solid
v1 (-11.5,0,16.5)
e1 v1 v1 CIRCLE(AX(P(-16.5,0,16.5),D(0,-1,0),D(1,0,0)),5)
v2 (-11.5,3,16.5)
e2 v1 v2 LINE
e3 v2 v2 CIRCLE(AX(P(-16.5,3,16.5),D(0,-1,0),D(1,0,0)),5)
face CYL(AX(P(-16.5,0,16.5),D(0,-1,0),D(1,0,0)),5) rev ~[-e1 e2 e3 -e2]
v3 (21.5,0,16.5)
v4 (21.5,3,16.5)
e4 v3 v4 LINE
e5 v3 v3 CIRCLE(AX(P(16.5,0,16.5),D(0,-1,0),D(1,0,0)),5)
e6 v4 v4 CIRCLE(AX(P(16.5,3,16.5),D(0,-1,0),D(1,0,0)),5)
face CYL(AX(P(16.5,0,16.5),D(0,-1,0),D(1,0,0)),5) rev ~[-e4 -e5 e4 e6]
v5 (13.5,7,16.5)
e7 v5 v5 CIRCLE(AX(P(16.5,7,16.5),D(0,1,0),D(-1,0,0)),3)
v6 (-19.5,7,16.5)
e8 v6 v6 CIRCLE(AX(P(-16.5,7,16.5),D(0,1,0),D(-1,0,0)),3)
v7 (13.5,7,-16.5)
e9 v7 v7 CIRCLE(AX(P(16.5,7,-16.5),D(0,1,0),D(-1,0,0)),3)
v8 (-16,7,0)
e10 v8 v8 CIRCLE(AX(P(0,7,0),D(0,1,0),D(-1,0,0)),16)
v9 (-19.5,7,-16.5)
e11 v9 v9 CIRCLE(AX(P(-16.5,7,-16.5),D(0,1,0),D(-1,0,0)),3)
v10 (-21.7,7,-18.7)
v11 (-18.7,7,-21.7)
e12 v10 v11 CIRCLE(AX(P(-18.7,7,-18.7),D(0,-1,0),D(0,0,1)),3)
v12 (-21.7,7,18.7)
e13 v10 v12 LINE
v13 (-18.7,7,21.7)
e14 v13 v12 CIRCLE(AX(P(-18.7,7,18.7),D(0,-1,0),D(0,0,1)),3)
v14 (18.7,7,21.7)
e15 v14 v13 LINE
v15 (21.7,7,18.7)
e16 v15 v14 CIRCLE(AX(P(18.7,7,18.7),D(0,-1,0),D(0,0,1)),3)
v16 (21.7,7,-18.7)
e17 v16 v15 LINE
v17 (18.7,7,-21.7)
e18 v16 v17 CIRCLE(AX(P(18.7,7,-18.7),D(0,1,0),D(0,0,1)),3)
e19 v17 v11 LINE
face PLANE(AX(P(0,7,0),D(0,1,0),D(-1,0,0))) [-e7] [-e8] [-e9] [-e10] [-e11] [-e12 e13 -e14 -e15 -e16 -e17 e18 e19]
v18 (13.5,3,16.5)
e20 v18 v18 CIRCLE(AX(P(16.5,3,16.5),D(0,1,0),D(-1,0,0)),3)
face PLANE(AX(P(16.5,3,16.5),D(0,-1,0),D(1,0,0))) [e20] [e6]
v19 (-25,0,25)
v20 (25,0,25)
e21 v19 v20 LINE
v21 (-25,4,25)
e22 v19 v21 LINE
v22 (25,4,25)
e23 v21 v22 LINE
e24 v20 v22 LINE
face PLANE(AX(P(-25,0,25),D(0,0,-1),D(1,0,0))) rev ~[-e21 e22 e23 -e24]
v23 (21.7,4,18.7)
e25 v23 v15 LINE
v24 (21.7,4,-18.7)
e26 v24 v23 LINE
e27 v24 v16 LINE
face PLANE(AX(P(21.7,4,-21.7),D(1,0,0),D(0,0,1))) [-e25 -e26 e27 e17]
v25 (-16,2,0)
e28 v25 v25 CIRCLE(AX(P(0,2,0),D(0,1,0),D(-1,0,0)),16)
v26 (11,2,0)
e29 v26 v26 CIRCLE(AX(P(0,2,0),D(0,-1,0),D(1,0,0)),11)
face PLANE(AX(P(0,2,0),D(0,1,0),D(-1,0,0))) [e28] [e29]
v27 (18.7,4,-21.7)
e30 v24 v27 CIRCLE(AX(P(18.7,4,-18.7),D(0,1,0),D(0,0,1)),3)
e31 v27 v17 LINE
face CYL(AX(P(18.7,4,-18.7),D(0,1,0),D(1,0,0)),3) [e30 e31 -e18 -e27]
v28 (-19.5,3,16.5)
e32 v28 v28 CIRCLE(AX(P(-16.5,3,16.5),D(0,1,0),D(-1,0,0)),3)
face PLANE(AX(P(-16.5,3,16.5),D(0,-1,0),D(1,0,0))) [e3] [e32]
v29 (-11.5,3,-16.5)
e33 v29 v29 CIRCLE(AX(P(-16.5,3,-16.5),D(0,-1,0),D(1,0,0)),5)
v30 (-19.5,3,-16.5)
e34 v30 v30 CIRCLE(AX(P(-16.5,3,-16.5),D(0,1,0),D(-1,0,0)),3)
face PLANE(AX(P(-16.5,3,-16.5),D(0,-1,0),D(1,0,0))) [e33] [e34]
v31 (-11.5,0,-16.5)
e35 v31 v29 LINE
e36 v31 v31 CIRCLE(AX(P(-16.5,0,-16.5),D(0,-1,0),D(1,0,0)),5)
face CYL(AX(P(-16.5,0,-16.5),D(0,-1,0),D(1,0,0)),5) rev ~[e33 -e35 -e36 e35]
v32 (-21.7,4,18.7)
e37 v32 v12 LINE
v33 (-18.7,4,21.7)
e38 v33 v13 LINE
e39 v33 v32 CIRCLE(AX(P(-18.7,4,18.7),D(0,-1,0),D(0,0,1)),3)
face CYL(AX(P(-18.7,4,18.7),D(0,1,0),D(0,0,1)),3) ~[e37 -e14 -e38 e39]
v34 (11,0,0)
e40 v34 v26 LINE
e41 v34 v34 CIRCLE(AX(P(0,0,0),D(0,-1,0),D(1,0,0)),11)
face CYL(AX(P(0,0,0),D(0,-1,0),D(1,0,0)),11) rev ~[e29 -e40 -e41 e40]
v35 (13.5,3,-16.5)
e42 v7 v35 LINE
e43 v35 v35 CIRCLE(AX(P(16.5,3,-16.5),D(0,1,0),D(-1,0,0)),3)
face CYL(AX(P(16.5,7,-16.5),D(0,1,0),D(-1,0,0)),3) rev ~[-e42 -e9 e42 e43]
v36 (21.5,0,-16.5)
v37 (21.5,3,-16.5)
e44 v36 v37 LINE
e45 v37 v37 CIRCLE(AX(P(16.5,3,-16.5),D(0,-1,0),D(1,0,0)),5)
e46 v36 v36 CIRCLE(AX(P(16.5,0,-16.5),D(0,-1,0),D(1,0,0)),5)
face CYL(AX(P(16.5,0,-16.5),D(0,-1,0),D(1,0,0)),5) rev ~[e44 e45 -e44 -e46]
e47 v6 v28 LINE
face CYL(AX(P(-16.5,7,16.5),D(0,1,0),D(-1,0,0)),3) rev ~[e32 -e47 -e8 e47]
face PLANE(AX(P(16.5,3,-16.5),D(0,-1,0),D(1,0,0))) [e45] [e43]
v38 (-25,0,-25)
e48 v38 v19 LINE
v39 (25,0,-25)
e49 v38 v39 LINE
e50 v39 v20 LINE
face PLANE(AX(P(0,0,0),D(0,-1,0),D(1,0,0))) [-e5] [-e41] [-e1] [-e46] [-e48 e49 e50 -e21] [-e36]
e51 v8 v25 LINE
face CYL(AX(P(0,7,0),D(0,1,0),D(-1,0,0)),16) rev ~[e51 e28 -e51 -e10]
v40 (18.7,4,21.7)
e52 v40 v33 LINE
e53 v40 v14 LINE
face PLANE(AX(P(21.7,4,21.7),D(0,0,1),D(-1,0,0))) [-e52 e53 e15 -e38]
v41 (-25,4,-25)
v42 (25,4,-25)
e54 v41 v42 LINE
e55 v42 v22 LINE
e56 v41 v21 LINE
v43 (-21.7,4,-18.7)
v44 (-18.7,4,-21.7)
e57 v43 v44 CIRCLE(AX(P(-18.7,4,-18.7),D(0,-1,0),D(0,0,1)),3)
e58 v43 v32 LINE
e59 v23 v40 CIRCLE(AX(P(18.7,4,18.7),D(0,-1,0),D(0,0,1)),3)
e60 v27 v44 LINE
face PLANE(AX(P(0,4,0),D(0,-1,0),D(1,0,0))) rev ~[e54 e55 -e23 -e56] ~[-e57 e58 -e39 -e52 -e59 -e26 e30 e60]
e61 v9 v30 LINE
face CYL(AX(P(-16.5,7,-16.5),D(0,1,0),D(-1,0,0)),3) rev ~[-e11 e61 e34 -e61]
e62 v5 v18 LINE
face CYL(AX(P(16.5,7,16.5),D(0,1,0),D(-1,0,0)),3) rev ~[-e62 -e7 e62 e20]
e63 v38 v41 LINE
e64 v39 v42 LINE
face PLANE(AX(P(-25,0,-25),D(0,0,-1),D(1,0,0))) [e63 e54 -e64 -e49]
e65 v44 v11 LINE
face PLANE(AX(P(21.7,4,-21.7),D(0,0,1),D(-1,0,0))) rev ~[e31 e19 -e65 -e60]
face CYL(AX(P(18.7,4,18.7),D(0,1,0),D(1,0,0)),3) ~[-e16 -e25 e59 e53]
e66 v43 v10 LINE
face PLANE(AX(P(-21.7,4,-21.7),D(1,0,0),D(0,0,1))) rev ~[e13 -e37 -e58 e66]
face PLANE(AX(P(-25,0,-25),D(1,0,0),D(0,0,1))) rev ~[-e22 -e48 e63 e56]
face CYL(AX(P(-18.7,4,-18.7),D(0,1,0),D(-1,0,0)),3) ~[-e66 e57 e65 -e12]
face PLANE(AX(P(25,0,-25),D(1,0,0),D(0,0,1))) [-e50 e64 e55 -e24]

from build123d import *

# Parameters (mm, degrees)
F0_W      = 50
F0_H      = 50
F1_DEPTH  = 4
F2_W      = 43.4
F2_H      = 43.4
F3_DEPTH  = 3
F4_R      = 3
F5_DEPTH  = 25
F6_R      = 5
F6_R_2    = 3
F7_DEPTH  = 3
F8_R      = 16
F9_DEPTH  = 5
F10_R     = 11
F11_DEPTH = 25
F12_R     = 3


# Not quite as in the source:
# - a feature names something its author has since deleted; it is built from what else it names


with BuildPart() as f1:
    # F0 (on Front) → F1 (new body)
    with BuildSketch(Plane.XZ):
        Rectangle(F0_W, F0_H)
    extrude(amount=-F1_DEPTH)

    # F2 (on face) → F3 (join)
    with BuildSketch(Plane(origin=(0, 4, 0), x_dir=(-1, 0, 0), z_dir=(0, 1, 0))):
        Rectangle(F2_W, F2_H)
    extrude(amount=F3_DEPTH)

    # F4 (on face) → F5 (cut)
    with BuildSketch(Plane(origin=(0, 7, 0), x_dir=(-1, 0, 0), z_dir=(0, 1, 0))):
        with Locations((-16.5, 16.5)):
            Circle(F4_R)
        with Locations((16.5, 16.5)):
            Circle(F4_R)
        with Locations((16.5, -16.5)):
            Circle(F4_R)
        with Locations((-16.5, -16.5)):
            Circle(F4_R)
    extrude(amount=-F5_DEPTH, mode=Mode.SUBTRACT)

    # F6 (on face) → F7 (cut)
    with BuildSketch(Plane.XZ):
        with Locations((-16.5, 16.5)):
            Circle(F6_R)
        with Locations((-16.5, 16.5)):
            Circle(F6_R_2, mode=Mode.SUBTRACT)
        with Locations((16.5, 16.5)):
            Circle(F6_R)
        with Locations((16.5, 16.5)):
            Circle(F6_R_2, mode=Mode.SUBTRACT)
        with Locations((16.5, -16.5)):
            Circle(F6_R)
        with Locations((16.5, -16.5)):
            Circle(F6_R_2, mode=Mode.SUBTRACT)
        with Locations((-16.5, -16.5)):
            Circle(F6_R)
        with Locations((-16.5, -16.5)):
            Circle(F6_R_2, mode=Mode.SUBTRACT)
    extrude(amount=-F7_DEPTH, mode=Mode.SUBTRACT)

    # F8 (on face) → F9 (cut)
    with BuildSketch(Plane(origin=(0, 7, 0), x_dir=(-1, 0, 0), z_dir=(0, 1, 0))):
        Circle(F8_R)
    extrude(amount=-F9_DEPTH, mode=Mode.SUBTRACT)

    # F10 (on face) → F11 (cut)
    with BuildSketch(Plane.XZ):
        Circle(F10_R)
    extrude(amount=-F11_DEPTH, mode=Mode.SUBTRACT)

    # F12
    f12_edges = [f1.edges().sort_by_distance(p)[0] for p in [
        (21.7, 5.5, 21.7),
        (-21.7, 5.5, 21.7),
        (-21.7, 5.5, -21.7),
        (21.7, 5.5, -21.7),
    ]]
    fillet(f12_edges, radius=F12_R)


solid = f1.part
